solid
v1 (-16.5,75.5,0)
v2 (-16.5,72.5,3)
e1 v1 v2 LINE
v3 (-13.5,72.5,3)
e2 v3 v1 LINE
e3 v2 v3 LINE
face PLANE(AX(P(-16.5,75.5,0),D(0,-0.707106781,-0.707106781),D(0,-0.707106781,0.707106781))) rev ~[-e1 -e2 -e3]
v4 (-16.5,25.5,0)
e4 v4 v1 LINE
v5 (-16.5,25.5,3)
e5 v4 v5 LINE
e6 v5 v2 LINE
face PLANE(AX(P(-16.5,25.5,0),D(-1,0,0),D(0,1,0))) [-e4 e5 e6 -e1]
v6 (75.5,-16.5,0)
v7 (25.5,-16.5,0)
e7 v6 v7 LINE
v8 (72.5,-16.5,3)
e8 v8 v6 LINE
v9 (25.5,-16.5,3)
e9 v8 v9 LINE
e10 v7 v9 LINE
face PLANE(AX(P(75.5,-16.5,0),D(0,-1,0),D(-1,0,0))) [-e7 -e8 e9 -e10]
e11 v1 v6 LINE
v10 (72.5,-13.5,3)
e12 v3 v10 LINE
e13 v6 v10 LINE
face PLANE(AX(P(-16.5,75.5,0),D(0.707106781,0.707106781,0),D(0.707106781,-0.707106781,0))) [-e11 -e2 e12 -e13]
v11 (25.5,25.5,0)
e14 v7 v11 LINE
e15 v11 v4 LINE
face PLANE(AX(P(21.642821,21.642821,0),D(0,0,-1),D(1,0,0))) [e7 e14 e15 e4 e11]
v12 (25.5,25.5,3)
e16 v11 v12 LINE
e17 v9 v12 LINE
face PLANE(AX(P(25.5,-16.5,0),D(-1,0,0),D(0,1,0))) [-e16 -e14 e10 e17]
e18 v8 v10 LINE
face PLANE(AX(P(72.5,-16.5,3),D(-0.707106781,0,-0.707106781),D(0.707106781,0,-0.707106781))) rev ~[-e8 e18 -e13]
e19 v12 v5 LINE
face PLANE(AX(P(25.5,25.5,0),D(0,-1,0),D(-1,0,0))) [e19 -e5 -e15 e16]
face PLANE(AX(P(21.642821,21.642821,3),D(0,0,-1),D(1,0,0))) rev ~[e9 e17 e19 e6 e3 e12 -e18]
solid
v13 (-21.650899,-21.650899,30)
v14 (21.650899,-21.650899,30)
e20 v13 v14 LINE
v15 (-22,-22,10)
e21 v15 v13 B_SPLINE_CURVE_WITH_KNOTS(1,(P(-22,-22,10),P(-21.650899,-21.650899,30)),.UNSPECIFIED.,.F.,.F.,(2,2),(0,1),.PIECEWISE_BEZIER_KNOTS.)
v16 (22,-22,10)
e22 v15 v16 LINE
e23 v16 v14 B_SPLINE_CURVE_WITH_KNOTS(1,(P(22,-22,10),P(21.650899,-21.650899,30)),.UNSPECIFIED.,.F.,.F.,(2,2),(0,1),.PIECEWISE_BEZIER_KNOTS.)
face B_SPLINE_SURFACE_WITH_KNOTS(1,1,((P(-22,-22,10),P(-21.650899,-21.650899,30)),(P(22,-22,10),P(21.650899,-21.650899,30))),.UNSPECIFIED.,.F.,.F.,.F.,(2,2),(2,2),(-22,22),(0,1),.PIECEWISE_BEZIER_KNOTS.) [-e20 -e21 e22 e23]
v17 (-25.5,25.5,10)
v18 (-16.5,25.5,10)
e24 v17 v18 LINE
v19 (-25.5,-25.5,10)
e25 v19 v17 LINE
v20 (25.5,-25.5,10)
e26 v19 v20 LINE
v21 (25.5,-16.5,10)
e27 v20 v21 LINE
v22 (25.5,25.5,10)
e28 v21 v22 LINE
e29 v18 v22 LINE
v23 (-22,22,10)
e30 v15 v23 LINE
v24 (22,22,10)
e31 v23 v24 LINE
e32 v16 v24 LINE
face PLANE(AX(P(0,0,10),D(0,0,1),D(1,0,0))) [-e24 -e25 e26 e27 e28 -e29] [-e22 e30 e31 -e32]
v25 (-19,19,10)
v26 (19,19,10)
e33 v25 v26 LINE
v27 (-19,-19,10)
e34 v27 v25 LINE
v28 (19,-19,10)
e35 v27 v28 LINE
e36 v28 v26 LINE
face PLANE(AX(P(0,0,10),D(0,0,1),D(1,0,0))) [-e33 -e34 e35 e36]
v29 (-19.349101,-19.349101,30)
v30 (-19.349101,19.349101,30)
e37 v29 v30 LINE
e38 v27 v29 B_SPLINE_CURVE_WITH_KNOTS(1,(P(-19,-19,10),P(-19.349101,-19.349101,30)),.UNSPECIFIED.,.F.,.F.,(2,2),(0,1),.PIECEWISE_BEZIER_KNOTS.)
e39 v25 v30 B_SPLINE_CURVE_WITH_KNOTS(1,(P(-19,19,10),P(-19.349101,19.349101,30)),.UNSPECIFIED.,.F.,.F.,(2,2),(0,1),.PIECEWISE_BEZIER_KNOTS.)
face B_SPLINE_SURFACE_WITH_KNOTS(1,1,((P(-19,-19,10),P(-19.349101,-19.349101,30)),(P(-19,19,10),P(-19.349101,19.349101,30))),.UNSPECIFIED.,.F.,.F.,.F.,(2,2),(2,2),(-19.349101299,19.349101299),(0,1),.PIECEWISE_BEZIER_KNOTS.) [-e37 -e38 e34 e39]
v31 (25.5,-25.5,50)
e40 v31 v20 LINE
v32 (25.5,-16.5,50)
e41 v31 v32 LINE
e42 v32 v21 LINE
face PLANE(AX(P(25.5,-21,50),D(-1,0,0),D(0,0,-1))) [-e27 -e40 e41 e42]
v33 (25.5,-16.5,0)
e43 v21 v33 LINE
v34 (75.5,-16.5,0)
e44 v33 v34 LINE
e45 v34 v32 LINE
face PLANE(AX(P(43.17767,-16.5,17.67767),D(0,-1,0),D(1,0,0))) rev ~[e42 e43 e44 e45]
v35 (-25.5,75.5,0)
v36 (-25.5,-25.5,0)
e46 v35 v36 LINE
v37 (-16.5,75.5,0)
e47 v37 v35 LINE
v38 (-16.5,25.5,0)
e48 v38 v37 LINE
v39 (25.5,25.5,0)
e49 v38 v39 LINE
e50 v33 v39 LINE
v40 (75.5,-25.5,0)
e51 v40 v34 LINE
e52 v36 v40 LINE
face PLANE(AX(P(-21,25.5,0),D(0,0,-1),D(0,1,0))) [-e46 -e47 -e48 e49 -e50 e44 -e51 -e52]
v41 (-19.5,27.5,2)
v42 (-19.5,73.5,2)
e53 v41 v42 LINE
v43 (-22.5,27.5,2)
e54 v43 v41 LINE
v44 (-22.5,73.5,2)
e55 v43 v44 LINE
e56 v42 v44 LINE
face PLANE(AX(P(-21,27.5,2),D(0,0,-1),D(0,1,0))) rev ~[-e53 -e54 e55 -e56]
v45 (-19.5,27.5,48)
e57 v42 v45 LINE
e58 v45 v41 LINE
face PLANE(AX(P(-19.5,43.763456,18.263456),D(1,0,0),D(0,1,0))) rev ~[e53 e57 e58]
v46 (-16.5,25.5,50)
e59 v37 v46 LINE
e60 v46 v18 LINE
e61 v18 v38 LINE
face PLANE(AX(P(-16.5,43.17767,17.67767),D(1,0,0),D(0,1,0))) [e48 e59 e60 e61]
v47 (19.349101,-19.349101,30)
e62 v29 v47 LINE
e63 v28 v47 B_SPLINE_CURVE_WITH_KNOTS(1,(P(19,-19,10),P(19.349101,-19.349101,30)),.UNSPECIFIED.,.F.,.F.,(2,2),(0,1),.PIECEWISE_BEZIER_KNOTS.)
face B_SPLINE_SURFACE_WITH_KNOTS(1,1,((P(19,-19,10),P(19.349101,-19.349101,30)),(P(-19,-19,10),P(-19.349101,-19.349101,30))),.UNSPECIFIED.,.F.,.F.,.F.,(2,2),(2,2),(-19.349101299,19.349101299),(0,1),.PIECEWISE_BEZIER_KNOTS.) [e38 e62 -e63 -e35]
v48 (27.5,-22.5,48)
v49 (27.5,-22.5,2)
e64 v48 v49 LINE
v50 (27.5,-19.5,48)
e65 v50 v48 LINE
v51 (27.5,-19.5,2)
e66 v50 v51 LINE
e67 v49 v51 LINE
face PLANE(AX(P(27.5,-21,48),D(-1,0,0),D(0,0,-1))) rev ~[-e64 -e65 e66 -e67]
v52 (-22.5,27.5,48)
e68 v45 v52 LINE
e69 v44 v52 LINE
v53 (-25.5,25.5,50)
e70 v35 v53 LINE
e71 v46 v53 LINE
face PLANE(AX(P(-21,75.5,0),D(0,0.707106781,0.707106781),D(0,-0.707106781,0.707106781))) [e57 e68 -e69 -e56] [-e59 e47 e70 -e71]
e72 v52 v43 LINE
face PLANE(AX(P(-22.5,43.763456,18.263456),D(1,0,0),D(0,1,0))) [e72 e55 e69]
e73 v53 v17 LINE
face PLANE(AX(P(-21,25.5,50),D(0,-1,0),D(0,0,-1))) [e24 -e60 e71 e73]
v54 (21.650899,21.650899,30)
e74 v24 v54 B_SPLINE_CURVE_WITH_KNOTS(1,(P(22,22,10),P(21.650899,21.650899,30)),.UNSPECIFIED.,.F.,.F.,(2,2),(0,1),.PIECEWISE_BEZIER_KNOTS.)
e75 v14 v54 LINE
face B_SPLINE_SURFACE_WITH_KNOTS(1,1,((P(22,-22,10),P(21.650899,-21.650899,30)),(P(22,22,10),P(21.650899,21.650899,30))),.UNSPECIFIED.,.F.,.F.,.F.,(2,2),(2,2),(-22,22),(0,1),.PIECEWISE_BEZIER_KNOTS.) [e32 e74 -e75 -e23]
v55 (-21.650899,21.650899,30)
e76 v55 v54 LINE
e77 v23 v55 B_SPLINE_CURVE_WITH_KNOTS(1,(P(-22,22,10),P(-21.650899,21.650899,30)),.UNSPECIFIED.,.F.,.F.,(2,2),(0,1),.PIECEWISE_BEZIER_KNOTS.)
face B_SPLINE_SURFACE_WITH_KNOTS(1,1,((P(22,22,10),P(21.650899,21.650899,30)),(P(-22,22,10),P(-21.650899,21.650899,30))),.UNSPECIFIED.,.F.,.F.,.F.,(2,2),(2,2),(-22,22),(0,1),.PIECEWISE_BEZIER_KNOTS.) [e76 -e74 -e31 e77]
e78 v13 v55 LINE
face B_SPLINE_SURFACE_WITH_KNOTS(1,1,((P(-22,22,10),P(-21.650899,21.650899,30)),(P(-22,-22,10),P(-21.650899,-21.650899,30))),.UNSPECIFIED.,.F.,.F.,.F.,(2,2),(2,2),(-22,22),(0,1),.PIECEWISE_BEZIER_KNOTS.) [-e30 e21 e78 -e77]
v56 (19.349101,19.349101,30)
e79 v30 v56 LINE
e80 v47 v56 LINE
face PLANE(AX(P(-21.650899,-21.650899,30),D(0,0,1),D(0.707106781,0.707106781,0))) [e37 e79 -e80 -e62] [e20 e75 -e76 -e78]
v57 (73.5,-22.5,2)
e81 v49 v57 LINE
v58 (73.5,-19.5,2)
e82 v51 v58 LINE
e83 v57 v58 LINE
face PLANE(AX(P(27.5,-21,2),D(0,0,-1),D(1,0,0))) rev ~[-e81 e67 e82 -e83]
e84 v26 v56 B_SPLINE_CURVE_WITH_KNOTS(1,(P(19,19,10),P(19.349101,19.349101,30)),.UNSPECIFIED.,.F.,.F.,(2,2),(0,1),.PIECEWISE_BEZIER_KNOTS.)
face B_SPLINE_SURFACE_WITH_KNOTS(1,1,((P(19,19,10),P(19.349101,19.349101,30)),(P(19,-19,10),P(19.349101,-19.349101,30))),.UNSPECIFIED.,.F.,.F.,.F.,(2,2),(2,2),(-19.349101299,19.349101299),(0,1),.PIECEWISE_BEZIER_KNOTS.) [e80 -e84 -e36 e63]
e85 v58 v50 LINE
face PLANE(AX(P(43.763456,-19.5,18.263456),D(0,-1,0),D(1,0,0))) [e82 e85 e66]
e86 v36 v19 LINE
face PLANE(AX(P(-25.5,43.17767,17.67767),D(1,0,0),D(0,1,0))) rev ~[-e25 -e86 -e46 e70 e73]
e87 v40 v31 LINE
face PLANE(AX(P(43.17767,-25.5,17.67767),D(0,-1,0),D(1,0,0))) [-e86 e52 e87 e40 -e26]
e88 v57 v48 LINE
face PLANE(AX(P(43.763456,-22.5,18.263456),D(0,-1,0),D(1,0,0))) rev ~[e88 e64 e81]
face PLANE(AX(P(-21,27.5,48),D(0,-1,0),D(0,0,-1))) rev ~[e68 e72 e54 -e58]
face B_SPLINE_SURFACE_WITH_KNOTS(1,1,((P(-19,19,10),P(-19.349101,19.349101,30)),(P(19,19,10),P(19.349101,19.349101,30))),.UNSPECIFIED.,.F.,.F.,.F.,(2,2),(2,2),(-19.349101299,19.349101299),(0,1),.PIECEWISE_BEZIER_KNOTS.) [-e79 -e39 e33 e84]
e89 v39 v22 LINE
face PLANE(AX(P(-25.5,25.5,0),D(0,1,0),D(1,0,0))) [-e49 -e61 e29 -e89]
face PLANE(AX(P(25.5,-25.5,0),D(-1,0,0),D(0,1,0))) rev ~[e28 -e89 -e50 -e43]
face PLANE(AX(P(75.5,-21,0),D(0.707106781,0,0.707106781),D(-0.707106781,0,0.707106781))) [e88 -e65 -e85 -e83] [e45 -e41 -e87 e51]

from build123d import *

# Parameters (mm, degrees)
F0_W      = 51
F0_H      = 51
F1_DEPTH  = 10
F4_DEPTH  = 4.5
F6_DEPTH  = 1.5
F9_DEPTH  = 4.5
F11_DEPTH = 1.5
F12_W     = 44
F12_H     = 44
F12_W_2   = 38
F12_H_2   = 38
F13_DEPTH = 20
F13_TAPER = 1
F15_DEPTH = 3
F17_DEPTH = 25
F19_DEPTH = 25


with BuildPart() as f1:
    # F0 (on Top) → F1 (new body)
    with BuildSketch(Plane.XY):
        Rectangle(F0_W, F0_H)
    extrude(amount=F1_DEPTH)

    # F3 (on offset) → F4 (join, symmetric)
    with BuildSketch(Plane.XZ.offset(21)):
        Polygon((25.5, 50), (25.5, 0), (75.5, 0), align=None)
    extrude(amount=F4_DEPTH, both=True)

    # F5 (on offset) → F6 (cut, symmetric)
    with BuildSketch(Plane.XZ.offset(21)):
        Polygon((73.5, 2), (27.5, 48), (27.5, 2), align=None)
    extrude(amount=F6_DEPTH, both=True, mode=Mode.SUBTRACT)

    # F8 (on offset) → F9 (join, symmetric)
    with BuildSketch(Plane.YZ.offset(-21)):
        Polygon((25.5, 50), (25.5, 0), (75.5, 0), align=None)
    extrude(amount=F9_DEPTH, both=True)

    # F10 (on offset) → F11 (cut, symmetric)
    with BuildSketch(Plane.YZ.offset(-21)):
        Polygon((27.5, 48), (27.5, 2), (73.5, 2), align=None)
    extrude(amount=F11_DEPTH, both=True, mode=Mode.SUBTRACT)

    # F12 (on face) → F13 (join)
    with BuildSketch(Plane.XY.offset(10)):
        Rectangle(F12_W, F12_H)
        Rectangle(F12_W_2, F12_H_2, mode=Mode.SUBTRACT)
    extrude(amount=F13_DEPTH, taper=F13_TAPER)


with BuildPart() as f15:
    # F14 (on face) → F15 (new body)
    with BuildSketch(Plane(origin=(0, 0, 0), x_dir=(1, 0, 0), z_dir=(0, 0, -1))):
        Polygon((-16.5, -25.5), (-16.5, -75.5), (75.5, 16.5), (25.5, 16.5), (25.5, -25.5), align=None)
    extrude(amount=-F15_DEPTH)

    # F16 (on face) → F17 (cut)
    with BuildSketch(Plane(origin=(-16.5, 0, 0), x_dir=(0, -1, 0), z_dir=(-1, 0, 0))):
        Polygon((-72.5, 3), (-75.5, 3), (-75.5, 0), align=None)
    extrude(amount=-F17_DEPTH, mode=Mode.SUBTRACT)

    # F18 (on face) → F19 (cut)
    with BuildSketch(Plane.XZ.offset(16.5)):
        Polygon((75.5, 0), (75.5, 3), (72.5, 3), align=None)
    extrude(amount=-F19_DEPTH, mode=Mode.SUBTRACT)


solid = Compound([f1.part, f15.part])
